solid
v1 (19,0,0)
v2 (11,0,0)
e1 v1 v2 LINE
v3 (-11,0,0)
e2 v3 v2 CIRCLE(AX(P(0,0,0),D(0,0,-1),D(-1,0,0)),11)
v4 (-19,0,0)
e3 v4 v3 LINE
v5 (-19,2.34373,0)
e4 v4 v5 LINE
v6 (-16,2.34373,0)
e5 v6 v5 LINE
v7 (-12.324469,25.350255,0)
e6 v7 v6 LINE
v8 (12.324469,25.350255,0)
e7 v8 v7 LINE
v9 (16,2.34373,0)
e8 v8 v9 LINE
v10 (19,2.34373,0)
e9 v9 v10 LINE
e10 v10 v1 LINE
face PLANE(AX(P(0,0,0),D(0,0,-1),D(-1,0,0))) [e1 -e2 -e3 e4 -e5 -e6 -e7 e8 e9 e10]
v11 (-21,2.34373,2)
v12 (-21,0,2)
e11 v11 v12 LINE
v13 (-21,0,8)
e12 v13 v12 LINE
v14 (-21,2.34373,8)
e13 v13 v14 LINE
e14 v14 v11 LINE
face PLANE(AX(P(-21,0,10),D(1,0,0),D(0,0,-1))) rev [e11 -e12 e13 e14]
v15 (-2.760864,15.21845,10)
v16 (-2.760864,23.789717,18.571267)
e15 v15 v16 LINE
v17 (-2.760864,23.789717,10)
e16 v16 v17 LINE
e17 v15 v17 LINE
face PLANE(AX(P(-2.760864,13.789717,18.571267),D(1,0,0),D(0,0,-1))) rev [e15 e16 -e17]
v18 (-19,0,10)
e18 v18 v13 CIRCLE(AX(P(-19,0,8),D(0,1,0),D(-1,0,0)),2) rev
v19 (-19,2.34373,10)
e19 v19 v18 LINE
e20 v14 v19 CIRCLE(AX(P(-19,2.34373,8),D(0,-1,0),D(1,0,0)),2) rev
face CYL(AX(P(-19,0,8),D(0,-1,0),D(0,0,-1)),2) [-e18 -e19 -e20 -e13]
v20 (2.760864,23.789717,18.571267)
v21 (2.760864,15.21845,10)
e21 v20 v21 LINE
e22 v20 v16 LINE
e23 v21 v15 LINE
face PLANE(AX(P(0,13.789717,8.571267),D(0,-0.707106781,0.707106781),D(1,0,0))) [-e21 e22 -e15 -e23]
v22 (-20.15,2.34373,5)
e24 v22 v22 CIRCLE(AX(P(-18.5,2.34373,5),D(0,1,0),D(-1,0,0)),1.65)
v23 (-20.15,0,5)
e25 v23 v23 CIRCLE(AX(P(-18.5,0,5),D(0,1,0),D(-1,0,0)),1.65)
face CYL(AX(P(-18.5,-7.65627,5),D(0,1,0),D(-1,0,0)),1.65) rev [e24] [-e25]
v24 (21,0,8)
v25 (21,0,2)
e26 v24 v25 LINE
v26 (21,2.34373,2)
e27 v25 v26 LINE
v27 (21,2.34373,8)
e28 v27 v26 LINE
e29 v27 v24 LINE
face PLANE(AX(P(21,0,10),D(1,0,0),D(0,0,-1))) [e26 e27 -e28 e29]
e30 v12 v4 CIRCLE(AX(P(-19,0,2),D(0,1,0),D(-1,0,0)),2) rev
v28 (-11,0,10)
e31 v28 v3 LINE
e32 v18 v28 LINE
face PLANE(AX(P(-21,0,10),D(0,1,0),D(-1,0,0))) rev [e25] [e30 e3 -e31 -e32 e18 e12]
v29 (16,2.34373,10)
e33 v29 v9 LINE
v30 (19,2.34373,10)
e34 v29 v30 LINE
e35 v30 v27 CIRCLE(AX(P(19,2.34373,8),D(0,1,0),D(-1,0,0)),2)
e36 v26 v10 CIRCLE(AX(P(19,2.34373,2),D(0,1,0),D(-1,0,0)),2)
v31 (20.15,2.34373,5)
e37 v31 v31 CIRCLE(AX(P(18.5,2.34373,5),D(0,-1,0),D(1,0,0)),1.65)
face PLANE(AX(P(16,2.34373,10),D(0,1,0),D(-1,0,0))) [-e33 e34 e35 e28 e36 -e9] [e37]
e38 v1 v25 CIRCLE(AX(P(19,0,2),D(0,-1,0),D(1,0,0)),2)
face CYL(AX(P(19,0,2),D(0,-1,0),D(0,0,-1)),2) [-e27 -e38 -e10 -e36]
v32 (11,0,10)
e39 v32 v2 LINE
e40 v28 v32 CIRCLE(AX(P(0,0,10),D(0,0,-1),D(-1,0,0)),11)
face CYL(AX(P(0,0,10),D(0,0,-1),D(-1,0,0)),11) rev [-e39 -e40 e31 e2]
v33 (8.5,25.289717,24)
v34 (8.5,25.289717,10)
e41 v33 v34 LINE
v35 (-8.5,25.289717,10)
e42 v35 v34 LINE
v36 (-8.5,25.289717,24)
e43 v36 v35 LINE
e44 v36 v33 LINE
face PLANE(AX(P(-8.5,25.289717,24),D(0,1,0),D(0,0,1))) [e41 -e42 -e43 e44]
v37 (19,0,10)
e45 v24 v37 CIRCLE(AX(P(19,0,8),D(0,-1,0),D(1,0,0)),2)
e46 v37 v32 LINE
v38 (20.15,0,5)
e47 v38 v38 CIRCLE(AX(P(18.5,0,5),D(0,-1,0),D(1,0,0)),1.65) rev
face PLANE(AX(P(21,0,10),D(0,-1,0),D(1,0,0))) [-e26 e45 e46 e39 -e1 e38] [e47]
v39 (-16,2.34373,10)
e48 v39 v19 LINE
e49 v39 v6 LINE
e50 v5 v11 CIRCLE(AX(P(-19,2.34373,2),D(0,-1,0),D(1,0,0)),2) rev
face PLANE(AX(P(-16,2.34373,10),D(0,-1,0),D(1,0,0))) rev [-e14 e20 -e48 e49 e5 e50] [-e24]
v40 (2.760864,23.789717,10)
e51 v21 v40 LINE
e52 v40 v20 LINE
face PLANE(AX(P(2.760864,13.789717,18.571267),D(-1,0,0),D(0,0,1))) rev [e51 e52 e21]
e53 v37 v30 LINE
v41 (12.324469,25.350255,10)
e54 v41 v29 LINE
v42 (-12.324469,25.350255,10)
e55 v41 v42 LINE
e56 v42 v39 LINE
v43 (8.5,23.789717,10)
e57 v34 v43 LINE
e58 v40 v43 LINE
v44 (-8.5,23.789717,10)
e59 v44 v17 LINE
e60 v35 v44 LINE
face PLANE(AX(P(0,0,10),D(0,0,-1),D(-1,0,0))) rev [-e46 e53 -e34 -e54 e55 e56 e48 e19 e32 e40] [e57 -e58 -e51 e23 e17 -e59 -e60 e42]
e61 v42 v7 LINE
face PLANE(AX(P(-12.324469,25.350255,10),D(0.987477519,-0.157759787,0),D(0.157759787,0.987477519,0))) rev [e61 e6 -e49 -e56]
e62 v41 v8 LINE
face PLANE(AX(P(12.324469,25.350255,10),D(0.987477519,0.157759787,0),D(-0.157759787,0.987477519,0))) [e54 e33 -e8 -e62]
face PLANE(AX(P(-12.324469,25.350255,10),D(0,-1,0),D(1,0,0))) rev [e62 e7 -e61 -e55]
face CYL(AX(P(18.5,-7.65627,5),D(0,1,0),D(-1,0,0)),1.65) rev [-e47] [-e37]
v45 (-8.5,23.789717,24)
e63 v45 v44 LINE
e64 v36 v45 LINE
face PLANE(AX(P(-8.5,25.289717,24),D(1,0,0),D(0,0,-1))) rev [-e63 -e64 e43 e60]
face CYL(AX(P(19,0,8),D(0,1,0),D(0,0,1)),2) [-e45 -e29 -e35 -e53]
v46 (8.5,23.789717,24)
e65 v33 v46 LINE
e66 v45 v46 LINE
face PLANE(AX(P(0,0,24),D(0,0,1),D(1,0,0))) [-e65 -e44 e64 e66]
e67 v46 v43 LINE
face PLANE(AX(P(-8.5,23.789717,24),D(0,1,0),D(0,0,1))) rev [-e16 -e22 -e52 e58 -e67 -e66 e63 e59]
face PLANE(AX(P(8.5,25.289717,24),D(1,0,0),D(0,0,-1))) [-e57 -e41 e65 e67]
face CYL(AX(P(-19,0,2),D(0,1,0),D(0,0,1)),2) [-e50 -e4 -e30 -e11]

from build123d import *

# Parameters (mm, degrees)
BOSS_EXTRUDE1_DEPTH  = 10
SKETCH2_R            = 1.65
EXTERNAL_HOLES_DEPTH = 10
FILLET1_R            = 2
FILLET1_OF_MIRROR1_R = 2
SKETCH4_W            = 17
SKETCH4_H            = 1.5
BOSS_EXTRUDE2_DEPTH  = 14
SKETCH5_W            = 5.521728368
SKETCH5_H            = 8.571266928
BOSS_EXTRUDE3_DEPTH  = 10
CHAMFER1_SIZE        = 10


with BuildPart() as part:
    # Sketch1 → Boss-Extrude1 (new body)
    with BuildSketch(Plane.XY):
        with BuildLine():
            Line((-21, 0), (-11, 0))
            ThreePointArc((-11, 0), (-7.778174593, 7.778174593), (0, 11))
            Line((0, 11), (0, 16.170747429))
            Line((0, 16.170747429), (0, 25.35025486))
            Line((0, 25.35025486), (-12.324468849, 25.35025486))
            Line((-12.324468849, 25.35025486), (-16, 2.343730447))
            Line((-16, 2.343730447), (-21, 2.343730447))
            Line((-21, 2.343730447), (-21, 0))
        make_face()
    boss_extrude1 = extrude(amount=BOSS_EXTRUDE1_DEPTH)

    # Sketch2 → External_holes (cut)
    with BuildSketch(Plane(origin=(0, 2.343730447, 0), x_dir=(1, 0, 0), z_dir=(0, 1, 0))):
        with Locations(Location((-18.5, -5, 0), (0, 0, 180))):
            Circle(SKETCH2_R)
    external_holes = extrude(amount=-EXTERNAL_HOLES_DEPTH, mode=Mode.SUBTRACT)

    # Fillet1
    fillet1_edges = [part.edges().sort_by_distance(p)[0] for p in [
        (-21, 1.171865223, 10),
        (-21, 1.171865223, 0),
    ]]
    fillet(fillet1_edges, radius=FILLET1_R)

    # Mirror1: Boss-Extrude1, External_holes across Right Plane
    add(boss_extrude1.mirror(Plane(origin=(0, 0, 0), x_dir=(0, 0, -1), z_dir=(1, 0, 0))))
    add(external_holes.mirror(Plane(origin=(0, 0, 0), x_dir=(0, 0, -1), z_dir=(1, 0, 0))), mode=Mode.SUBTRACT)

    # Fillet1 of Mirror1
    fillet1_of_mirror1_edges = [part.edges().sort_by_distance(p)[0] for p in [
        (21, 1.171865223, 10),
        (21, 1.171865223, 0),
    ]]
    fillet(fillet1_of_mirror1_edges, radius=FILLET1_OF_MIRROR1_R)

    # Sketch4 → Boss-Extrude2 (add)
    with BuildSketch(Plane.XY.offset(10)):
        with Locations((0, 24.539717426)):
            Rectangle(SKETCH4_W, SKETCH4_H)
    extrude(amount=BOSS_EXTRUDE2_DEPTH)

    # Sketch5 → Boss-Extrude3 (add)
    with BuildSketch(Plane.XZ.offset(-23.789717426)):
        with Locations((0, 14.285633464)):
            Rectangle(SKETCH5_W, SKETCH5_H)
    extrude(amount=BOSS_EXTRUDE3_DEPTH)

    # Chamfer1
    # the kernel refuses this chamfer: 10 mm, written as the material it takes off along each edge
    with BuildSketch(Plane(origin=(-28.477694064, 13.789717426, 18.571266928), x_dir=(0, -0.027495876610586317, -0.9996219169112968), z_dir=(1, 0, 0))) as chamfer1_piece_1_section:
        Polygon((CHAMFER1_SIZE * 0.999621916911, CHAMFER1_SIZE * 0.0274958766106), (-CHAMFER1_SIZE * 0.0274958766106, CHAMFER1_SIZE * 0.999621916911), (0, 0), align=None)
    chamfer1_piece_1 = extrude(amount=56.955388128, mode=Mode.PRIVATE)
    chamfer1_piece_1 = split(chamfer1_piece_1, bisect_by=Plane(origin=(0, 17.174320664, 10), z_dir=(0, 0, 1)), keep=Keep.TOP, mode=Mode.PRIVATE)
    chamfer1_piece_1 = split(chamfer1_piece_1, bisect_by=Plane(origin=(0, 23.789717426, 15.454914499), z_dir=(0, -1, 0)), keep=Keep.TOP, mode=Mode.PRIVATE)
    add(chamfer1_piece_1, mode=Mode.SUBTRACT)


solid = part.part
